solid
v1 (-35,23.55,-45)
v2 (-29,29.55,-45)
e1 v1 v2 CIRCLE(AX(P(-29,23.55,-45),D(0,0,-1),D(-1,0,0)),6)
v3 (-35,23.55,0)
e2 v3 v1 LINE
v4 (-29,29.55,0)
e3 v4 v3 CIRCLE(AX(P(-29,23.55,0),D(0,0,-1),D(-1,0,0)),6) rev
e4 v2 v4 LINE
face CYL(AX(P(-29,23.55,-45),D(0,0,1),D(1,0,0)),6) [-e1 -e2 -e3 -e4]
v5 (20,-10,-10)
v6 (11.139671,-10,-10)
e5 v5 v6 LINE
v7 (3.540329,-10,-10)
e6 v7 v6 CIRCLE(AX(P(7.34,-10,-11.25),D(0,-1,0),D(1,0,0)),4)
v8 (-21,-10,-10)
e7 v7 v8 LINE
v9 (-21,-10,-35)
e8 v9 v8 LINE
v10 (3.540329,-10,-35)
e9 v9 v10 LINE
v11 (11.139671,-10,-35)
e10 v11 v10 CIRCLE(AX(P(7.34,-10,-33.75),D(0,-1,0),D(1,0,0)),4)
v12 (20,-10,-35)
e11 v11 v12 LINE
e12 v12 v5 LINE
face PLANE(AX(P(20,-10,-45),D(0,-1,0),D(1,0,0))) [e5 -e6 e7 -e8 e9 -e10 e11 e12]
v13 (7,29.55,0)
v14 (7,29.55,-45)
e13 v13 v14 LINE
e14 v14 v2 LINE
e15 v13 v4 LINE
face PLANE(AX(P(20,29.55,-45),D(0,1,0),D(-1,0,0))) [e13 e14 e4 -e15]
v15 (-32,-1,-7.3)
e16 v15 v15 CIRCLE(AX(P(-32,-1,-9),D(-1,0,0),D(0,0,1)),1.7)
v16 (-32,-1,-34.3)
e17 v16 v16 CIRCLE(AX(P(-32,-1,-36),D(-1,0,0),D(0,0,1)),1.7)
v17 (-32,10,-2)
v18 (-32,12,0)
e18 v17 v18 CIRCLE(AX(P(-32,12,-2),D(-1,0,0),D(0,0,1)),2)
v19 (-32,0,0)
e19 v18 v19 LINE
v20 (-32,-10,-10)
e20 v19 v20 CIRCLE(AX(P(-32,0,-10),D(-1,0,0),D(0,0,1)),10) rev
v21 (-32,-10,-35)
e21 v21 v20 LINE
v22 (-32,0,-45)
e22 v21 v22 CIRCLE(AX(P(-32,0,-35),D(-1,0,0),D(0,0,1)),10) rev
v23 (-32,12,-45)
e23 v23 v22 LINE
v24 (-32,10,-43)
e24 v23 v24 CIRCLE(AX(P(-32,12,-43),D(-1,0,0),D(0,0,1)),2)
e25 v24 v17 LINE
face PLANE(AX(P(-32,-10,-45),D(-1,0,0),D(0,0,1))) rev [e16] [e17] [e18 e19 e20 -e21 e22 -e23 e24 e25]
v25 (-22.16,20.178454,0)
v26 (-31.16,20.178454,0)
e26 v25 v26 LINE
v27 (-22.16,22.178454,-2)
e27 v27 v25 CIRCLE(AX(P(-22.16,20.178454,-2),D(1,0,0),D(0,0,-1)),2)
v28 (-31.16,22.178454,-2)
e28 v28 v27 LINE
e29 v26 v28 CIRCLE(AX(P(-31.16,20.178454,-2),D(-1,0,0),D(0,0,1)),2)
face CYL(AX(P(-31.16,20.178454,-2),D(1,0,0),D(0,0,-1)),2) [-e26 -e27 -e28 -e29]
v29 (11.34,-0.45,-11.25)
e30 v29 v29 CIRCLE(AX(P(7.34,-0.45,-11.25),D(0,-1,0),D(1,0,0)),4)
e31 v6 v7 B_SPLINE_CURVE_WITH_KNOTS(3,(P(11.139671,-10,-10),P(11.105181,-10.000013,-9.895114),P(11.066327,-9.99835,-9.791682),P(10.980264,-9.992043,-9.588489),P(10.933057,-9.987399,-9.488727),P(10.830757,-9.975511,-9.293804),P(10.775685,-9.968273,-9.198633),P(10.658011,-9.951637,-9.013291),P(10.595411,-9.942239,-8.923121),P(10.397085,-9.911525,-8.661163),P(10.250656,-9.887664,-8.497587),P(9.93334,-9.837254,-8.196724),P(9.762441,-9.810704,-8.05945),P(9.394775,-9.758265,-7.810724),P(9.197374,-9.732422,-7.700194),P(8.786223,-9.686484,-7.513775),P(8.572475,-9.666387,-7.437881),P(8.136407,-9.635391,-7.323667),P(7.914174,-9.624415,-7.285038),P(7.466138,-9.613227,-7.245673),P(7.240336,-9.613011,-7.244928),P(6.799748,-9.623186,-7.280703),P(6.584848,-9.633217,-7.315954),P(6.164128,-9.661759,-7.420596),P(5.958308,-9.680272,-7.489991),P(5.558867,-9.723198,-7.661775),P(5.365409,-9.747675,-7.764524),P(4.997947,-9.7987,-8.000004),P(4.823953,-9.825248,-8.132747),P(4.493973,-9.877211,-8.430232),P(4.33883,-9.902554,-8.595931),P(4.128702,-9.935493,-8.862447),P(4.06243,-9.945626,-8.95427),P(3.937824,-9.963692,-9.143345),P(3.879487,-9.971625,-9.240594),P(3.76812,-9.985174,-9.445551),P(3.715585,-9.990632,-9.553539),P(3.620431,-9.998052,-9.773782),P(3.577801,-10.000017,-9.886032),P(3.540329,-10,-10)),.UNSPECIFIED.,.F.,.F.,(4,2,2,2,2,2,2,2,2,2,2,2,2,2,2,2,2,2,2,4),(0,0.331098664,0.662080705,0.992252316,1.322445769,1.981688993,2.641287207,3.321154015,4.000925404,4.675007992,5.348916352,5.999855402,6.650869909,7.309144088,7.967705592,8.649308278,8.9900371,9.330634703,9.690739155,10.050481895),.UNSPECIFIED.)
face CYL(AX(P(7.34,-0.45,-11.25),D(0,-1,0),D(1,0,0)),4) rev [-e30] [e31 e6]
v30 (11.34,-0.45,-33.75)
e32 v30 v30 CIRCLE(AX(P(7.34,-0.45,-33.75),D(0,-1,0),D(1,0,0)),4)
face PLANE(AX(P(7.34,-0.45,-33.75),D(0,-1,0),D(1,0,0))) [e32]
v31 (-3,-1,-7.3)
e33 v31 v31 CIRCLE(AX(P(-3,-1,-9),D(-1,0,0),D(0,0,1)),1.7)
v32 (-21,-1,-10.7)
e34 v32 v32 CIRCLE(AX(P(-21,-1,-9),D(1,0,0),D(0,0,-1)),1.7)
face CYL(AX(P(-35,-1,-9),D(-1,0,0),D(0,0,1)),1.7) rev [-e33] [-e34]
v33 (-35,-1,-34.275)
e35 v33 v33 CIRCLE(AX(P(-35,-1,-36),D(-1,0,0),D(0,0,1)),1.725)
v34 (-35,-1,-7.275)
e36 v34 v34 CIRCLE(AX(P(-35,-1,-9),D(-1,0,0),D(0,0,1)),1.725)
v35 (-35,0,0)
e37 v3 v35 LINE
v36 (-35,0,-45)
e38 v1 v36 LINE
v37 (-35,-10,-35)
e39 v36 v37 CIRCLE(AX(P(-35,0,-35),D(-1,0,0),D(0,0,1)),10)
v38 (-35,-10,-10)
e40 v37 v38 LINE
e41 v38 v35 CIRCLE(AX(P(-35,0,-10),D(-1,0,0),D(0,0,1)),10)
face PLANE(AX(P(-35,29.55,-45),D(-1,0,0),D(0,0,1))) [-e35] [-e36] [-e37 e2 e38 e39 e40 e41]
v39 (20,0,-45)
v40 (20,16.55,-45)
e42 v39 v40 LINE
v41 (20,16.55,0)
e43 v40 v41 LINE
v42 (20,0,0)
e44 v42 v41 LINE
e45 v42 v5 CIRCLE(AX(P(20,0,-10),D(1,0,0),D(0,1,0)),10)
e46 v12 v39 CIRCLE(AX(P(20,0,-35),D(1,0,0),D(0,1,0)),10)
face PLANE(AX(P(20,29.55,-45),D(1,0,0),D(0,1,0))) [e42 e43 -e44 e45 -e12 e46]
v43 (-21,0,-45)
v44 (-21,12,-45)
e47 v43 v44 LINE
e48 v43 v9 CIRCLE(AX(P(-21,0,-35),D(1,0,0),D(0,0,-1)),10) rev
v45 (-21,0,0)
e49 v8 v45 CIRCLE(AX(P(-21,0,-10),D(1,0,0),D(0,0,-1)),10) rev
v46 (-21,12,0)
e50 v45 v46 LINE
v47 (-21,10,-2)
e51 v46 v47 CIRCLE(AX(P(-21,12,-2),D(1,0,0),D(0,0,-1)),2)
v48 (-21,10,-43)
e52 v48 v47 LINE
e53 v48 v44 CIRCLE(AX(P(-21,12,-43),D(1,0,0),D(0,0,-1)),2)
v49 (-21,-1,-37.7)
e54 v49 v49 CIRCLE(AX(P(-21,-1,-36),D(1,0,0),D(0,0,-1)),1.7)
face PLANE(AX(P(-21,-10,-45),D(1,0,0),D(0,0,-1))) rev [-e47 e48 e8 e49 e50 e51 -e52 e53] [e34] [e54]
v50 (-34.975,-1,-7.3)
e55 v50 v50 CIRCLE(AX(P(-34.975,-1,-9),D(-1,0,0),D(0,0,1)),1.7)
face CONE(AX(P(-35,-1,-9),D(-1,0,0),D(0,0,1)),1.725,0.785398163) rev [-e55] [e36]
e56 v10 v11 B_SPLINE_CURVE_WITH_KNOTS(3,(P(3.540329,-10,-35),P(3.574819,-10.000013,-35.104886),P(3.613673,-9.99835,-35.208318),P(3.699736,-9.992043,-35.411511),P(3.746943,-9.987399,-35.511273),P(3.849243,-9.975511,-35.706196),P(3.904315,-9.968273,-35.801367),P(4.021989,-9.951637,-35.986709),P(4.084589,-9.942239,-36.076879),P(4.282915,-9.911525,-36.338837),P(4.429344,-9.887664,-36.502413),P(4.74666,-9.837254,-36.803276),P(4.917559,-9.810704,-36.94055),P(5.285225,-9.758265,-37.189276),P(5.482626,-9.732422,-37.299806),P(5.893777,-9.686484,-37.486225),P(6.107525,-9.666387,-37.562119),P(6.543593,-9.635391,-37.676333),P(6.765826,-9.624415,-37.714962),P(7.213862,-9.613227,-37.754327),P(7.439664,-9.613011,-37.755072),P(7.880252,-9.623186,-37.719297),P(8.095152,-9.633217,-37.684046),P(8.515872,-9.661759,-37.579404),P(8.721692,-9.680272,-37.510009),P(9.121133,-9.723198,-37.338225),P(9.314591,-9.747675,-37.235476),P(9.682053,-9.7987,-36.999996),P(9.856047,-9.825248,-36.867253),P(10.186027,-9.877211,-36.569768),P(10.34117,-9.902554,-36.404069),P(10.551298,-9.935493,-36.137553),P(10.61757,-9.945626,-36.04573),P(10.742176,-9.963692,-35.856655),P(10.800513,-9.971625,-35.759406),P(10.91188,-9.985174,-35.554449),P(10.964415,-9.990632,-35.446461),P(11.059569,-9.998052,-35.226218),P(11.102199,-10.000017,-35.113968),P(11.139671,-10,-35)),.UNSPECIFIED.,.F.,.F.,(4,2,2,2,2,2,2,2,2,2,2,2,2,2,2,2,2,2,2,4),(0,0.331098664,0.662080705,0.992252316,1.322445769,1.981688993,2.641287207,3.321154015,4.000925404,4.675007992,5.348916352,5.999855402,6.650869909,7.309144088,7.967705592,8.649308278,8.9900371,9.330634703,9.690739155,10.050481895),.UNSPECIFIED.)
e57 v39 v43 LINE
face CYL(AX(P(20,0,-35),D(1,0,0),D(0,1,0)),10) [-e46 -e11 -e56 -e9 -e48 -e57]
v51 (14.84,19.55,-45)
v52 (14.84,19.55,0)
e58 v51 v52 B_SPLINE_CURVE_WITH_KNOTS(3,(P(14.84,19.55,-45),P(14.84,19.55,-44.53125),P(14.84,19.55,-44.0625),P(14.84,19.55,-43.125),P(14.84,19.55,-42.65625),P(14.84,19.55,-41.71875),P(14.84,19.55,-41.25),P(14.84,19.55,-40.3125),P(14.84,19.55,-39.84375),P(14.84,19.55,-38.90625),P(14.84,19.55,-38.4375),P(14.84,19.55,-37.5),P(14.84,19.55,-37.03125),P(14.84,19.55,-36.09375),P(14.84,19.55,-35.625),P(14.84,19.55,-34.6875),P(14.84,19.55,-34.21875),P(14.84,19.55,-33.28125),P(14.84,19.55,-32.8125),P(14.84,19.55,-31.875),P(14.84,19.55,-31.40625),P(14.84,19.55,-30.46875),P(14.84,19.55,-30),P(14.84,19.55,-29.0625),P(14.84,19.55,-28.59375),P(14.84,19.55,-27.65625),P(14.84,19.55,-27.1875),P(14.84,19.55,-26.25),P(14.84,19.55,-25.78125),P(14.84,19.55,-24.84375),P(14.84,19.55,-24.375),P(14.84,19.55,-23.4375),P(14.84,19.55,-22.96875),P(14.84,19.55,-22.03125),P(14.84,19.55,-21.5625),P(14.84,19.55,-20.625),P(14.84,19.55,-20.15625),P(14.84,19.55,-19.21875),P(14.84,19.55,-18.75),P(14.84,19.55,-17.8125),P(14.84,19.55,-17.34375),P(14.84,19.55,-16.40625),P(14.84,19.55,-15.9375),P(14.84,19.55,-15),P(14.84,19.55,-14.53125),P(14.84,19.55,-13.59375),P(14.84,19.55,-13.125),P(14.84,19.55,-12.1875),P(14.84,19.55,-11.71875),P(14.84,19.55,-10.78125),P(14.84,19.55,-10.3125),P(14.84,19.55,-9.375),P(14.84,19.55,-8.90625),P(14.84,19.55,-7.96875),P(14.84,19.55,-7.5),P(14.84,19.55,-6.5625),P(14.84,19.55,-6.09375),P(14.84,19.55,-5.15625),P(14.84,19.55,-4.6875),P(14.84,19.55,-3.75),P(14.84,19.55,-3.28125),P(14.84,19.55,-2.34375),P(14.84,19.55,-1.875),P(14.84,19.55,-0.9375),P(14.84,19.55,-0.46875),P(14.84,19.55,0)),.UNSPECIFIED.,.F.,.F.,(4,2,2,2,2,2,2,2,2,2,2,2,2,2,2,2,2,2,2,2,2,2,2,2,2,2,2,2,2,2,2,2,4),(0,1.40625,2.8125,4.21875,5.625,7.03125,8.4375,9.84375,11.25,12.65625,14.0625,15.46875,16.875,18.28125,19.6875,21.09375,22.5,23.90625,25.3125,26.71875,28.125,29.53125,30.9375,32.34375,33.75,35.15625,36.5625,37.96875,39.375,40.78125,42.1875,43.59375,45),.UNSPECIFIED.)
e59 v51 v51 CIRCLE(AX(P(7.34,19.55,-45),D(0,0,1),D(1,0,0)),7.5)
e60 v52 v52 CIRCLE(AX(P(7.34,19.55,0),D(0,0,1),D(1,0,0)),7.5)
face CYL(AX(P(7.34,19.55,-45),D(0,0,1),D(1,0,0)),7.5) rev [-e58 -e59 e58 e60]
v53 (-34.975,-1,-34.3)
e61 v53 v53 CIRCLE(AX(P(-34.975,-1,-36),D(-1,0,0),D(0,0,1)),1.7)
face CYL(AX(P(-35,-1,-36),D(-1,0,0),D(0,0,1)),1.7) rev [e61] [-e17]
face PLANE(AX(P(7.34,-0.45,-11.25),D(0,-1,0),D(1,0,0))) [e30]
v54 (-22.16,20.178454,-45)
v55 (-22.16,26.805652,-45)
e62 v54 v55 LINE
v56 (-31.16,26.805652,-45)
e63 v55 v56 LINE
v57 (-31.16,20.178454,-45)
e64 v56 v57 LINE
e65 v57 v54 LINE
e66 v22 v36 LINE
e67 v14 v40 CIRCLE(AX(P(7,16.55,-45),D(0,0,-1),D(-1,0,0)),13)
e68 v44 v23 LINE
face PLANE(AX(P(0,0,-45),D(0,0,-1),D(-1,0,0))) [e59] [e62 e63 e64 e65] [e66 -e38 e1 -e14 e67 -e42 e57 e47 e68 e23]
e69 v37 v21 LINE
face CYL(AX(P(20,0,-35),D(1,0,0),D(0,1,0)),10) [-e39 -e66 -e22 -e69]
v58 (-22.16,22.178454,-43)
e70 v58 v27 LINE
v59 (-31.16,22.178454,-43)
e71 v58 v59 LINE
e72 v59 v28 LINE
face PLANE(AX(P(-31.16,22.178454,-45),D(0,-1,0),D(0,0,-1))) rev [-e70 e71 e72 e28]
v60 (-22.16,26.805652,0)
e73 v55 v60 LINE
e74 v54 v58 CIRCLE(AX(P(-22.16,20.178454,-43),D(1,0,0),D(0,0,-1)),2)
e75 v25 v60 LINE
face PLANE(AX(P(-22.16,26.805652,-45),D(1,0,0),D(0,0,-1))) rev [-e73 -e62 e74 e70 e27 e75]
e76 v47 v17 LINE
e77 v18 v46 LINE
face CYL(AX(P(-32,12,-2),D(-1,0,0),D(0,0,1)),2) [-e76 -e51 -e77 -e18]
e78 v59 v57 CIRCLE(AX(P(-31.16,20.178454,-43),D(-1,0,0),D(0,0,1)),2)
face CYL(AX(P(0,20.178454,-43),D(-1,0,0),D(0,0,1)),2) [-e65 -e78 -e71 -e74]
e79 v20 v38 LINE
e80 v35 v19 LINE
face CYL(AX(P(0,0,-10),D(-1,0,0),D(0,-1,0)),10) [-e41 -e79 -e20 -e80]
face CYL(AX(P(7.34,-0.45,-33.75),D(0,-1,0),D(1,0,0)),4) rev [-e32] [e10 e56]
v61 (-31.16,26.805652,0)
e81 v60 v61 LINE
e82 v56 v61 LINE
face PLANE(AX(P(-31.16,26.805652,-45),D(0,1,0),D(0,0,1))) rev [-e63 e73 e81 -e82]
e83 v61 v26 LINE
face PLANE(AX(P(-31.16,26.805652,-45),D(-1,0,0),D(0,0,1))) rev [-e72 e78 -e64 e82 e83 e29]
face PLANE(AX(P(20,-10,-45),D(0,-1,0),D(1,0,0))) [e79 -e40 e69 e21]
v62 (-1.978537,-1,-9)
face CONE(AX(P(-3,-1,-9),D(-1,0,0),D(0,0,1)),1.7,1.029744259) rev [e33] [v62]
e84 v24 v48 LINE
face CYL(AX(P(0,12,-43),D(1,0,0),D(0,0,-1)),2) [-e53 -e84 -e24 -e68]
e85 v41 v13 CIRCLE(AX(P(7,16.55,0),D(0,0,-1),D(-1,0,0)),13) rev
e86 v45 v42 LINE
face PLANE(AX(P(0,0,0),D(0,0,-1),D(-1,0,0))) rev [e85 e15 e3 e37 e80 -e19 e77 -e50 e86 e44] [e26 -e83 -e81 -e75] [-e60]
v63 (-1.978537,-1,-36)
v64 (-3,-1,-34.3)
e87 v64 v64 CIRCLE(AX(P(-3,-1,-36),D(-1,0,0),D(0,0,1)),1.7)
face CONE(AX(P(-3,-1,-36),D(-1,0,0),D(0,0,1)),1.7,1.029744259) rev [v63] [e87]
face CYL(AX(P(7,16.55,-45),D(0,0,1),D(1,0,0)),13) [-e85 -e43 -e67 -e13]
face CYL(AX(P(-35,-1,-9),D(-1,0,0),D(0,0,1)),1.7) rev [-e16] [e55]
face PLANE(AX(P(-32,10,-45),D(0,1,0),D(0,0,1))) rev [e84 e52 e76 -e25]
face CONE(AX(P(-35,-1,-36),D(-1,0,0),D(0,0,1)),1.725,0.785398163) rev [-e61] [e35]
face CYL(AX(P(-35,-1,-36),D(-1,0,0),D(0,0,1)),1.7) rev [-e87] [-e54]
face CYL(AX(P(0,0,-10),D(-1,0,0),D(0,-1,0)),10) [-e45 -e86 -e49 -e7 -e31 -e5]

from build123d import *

# Parameters (mm, degrees)
SKETCH1_W                      = 55
SKETCH1_H                      = 39.55
SKETCH1_R                      = 7.5
BOSS_EXTRUDE1_DEPTH            = 45
SKETCH3_R                      = 4
CUT_EXTRUDE1_DEPTH             = 9.55
SKETCH4_W                      = 11
SKETCH4_H                      = 20
CUT_EXTRUDE2_DEPTH             = 65.21216785
M3_CLEARANCE_HOLE1_D           = 3.4
M3_CLEARANCE_HOLE1_DEPTH       = 32
M3_CLEARANCE_HOLE1_CSINK_D     = 3.45
M3_CLEARANCE_HOLE1_CSINK_ANGLE = 90
M3_CLEARANCE_HOLE1_TIP         = 1.021463052
SKETCH8_W                      = 9
SKETCH8_H                      = 4.627198444
CUT_EXTRUDE3_DEPTH             = 65.21216785
FILLET1_R                      = 10
FILLET2_R                      = 2
FILLET3_R                      = 6
FILLET4_R                      = 13


with BuildPart() as part:
    # Sketch1 → Boss-Extrude1 (new body)
    with BuildSketch(Plane.XY):
        with Locations((-7.5, 9.775)):
            Rectangle(SKETCH1_W, SKETCH1_H)
        with Locations((7.34, 19.55)):
            Circle(SKETCH1_R, mode=Mode.SUBTRACT)
    extrude(amount=-BOSS_EXTRUDE1_DEPTH)

    # Sketch3 → Cut-Extrude1 (cut)
    with BuildSketch(Plane.XZ.offset(10)):
        with Locations((7.34, -11.25)):
            Circle(SKETCH3_R)
        with Locations((7.34, -33.75)):
            Circle(SKETCH3_R)
    extrude(amount=-CUT_EXTRUDE1_DEPTH, mode=Mode.SUBTRACT)

    # Sketch4 → Cut-Extrude2 (cut, through all)
    with BuildSketch(Plane.XY):
        with Locations((-26.5, 0)):
            Rectangle(SKETCH4_W, SKETCH4_H)
    extrude(amount=-CUT_EXTRUDE2_DEPTH, mode=Mode.SUBTRACT)

    # M3 Clearance Hole1
    with Locations(Plane(origin=(-35, -1, -36), x_dir=(0, 0, -1), z_dir=(-1, 0, 0))):
        with Locations((0, 0), (-27, 0)):
            CounterSinkHole(M3_CLEARANCE_HOLE1_D / 2, M3_CLEARANCE_HOLE1_CSINK_D / 2, depth=M3_CLEARANCE_HOLE1_DEPTH, counter_sink_angle=M3_CLEARANCE_HOLE1_CSINK_ANGLE)
            with Locations((0, 0, -(M3_CLEARANCE_HOLE1_DEPTH + M3_CLEARANCE_HOLE1_TIP / 2))):  # 118° drill point
                Cone(0, M3_CLEARANCE_HOLE1_D / 2, M3_CLEARANCE_HOLE1_TIP, mode=Mode.SUBTRACT)

    # Sketch8 → Cut-Extrude3 (cut, through all)
    with BuildSketch(Plane.XY):
        with Locations((-26.66, 24.492052806)):
            Rectangle(SKETCH8_W, SKETCH8_H)
    extrude(amount=-CUT_EXTRUDE3_DEPTH, mode=Mode.SUBTRACT)

    # Fillet1
    # the kernel refuses this fillet: 10 mm, written as the material it takes off along each edge
    with BuildSketch(Plane(origin=(-46, -10, 0), x_dir=(0, 1, 0), z_dir=(1, 0, 0))) as fillet1_piece_1:
        with BuildLine():
            CenterArc((FILLET1_R, -FILLET1_R), FILLET1_R, 90, 90)
            Line((0, -FILLET1_R), (0, 0))
            Line((0, 0), (FILLET1_R, 0))
        make_face()
    extrude(amount=91, mode=Mode.SUBTRACT)
    with BuildSketch(Plane(origin=(-46, -10, -45), x_dir=(0, 1, 0), z_dir=(1, 0, 0))) as fillet1_piece_2:
        with BuildLine():
            CenterArc((FILLET1_R, FILLET1_R), FILLET1_R, 180, 90)
            Line((0, FILLET1_R), (0, 0))
            Line((0, 0), (FILLET1_R, 0))
        make_face()
    extrude(amount=91, mode=Mode.SUBTRACT)
    with BuildSketch(Plane(origin=(-60, -10, 0), x_dir=(0, 1, 0), z_dir=(1, 0, 0))) as fillet1_piece_3:
        with BuildLine():
            CenterArc((FILLET1_R, -FILLET1_R), FILLET1_R, 90, 90)
            Line((0, -FILLET1_R), (0, 0))
            Line((0, 0), (FILLET1_R, 0))
        make_face()
    extrude(amount=53, mode=Mode.SUBTRACT)
    with BuildSketch(Plane(origin=(-60, -10, -45), x_dir=(0, 1, 0), z_dir=(1, 0, 0))) as fillet1_piece_4:
        with BuildLine():
            CenterArc((FILLET1_R, FILLET1_R), FILLET1_R, 180, 90)
            Line((0, FILLET1_R), (0, 0))
            Line((0, 0), (FILLET1_R, 0))
        make_face()
    extrude(amount=53, mode=Mode.SUBTRACT)

    # Fillet2
    fillet2_edges = [part.edges().sort_by_distance(p)[0] for p in [
        (-26.5, 10, -45),
        (-26.5, 10, 0),
        (-26.66, 22.178453584, -45),
        (-26.66, 22.178453584, 0),
    ]]
    fillet(fillet2_edges, radius=FILLET2_R)

    # Fillet3
    fillet3_edges = [part.edges().sort_by_distance(p)[0] for p in [
        (-35, 29.55, -22.5),
    ]]
    fillet(fillet3_edges, radius=FILLET3_R)

    # Fillet4
    fillet4_edges = [part.edges().sort_by_distance(p)[0] for p in [
        (20, 29.55, -22.5),
    ]]
    fillet(fillet4_edges, radius=FILLET4_R)


solid = part.part
